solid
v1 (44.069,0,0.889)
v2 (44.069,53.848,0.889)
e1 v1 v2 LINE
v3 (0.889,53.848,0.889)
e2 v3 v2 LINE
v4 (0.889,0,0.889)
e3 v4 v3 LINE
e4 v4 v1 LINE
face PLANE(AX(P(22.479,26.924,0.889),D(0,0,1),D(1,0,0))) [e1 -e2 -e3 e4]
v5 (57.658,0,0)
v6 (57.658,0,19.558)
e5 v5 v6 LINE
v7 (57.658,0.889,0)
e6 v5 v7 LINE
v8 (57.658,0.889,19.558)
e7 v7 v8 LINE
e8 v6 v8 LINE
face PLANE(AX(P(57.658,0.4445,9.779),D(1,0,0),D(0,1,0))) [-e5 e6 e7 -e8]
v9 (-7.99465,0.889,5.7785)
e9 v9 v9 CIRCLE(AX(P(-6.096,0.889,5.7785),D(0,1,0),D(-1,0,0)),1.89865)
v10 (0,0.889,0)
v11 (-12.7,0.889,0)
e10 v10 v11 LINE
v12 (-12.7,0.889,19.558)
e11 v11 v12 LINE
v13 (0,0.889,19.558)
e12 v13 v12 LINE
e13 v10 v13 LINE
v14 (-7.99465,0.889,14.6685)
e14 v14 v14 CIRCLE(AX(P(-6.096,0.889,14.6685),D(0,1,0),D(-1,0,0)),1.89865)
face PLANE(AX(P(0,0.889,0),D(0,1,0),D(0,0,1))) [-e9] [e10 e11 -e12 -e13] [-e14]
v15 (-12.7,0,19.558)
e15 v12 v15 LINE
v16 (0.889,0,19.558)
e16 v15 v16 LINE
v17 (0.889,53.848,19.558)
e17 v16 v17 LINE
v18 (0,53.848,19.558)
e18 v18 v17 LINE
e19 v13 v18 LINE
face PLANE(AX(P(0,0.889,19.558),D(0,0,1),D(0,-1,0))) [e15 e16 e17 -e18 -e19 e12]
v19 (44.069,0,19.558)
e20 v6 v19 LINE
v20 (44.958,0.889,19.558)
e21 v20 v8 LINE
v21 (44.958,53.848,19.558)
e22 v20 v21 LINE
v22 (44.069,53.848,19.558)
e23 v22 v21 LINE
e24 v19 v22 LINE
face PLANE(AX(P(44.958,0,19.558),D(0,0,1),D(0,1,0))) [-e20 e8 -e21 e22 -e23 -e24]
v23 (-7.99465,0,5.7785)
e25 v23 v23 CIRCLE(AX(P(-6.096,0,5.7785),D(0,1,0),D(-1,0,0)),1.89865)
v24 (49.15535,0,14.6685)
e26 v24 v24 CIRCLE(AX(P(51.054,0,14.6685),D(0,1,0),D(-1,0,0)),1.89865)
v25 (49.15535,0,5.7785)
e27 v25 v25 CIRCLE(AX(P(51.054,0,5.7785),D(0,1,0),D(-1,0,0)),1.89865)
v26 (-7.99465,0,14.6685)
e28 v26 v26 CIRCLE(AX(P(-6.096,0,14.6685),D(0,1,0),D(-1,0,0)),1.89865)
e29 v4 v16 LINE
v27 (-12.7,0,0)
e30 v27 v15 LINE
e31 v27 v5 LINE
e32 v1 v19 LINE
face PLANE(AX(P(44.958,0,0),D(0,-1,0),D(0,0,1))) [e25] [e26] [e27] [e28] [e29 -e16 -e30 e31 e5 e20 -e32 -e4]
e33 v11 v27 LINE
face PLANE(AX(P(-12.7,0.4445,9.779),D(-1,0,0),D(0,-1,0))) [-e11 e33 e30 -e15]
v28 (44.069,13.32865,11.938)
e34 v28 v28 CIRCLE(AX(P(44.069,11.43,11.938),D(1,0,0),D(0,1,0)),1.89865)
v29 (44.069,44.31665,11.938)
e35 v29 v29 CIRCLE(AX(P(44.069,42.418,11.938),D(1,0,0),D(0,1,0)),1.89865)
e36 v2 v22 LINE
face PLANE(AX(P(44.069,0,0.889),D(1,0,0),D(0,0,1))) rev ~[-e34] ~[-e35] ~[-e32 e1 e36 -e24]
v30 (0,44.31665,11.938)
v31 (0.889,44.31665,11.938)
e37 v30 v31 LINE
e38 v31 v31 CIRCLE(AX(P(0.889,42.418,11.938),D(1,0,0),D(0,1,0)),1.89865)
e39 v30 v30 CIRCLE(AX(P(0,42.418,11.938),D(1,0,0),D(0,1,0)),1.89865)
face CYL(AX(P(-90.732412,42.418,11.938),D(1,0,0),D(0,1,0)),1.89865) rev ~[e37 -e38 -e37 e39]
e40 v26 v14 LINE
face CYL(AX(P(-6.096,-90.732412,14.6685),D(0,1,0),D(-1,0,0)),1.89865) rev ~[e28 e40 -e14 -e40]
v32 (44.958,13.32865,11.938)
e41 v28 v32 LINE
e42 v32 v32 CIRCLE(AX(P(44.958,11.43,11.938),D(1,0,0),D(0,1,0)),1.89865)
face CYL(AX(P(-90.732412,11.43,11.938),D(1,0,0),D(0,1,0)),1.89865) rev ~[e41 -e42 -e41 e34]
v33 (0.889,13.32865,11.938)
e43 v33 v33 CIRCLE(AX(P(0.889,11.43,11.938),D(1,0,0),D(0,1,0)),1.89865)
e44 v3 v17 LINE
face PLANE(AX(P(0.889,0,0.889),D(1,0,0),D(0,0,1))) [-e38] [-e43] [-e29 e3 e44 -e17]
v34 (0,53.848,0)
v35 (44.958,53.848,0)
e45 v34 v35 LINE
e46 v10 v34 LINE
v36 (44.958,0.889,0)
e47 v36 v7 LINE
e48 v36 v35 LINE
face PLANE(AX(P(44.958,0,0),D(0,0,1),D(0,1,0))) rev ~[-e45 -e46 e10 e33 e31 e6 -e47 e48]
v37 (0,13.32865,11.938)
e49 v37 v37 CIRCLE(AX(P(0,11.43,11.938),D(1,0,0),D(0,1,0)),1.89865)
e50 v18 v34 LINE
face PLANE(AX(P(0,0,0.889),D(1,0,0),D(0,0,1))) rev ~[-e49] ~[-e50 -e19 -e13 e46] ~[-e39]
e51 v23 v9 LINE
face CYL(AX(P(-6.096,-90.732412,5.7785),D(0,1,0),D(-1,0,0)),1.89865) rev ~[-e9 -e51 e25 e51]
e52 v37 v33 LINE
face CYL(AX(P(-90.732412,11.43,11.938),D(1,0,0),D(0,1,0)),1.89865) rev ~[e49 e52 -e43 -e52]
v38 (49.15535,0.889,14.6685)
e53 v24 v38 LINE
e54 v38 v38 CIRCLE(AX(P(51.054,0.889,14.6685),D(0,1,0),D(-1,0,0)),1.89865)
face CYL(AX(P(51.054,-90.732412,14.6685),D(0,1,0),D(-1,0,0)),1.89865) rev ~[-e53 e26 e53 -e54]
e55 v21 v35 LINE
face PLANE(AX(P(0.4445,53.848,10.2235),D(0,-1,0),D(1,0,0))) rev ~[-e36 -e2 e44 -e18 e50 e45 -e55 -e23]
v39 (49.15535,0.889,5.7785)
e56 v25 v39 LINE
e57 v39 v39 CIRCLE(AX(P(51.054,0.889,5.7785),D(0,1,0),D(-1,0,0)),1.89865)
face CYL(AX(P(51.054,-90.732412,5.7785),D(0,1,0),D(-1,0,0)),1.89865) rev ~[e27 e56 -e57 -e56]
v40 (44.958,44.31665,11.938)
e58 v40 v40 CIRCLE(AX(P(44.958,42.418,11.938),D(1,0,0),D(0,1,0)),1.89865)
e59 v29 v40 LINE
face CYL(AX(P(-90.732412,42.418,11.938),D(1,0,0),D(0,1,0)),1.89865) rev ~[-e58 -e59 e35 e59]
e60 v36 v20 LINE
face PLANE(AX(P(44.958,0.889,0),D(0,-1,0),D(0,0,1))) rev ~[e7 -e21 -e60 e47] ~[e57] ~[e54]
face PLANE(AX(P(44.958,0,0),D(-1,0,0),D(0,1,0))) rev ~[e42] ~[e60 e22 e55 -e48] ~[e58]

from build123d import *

# Parameters (mm, degrees)
F0_W     = 44.958
F0_H     = 53.848
F1_DEPTH = 0.889
F2_W     = 0.889
F2_H     = 18.669
F3_DEPTH = 53.848
F4_W     = 0.889
F4_H     = 19.558
F5_DEPTH = 12.7
F6_W     = 0.889
F6_H     = 19.558
F7_DEPTH = 12.7
F9_D     = 3.7973
F11_D    = 3.7973


# Not quite as in the source:
# - a feature names something its author has since deleted; it is built from what else it names


with BuildPart() as f1:
    # F0 (on Top) → F1 (new body)
    with BuildSketch(Plane.XY):
        with Locations((22.479, 26.924)):
            Rectangle(F0_W, F0_H)
    extrude(amount=F1_DEPTH)

    # F2 (on face) → F3 (join, through all)
    with BuildSketch(Plane.XZ):
        with Locations((0.4445, 10.2235)):
            Rectangle(F2_W, F2_H)
        with Locations((44.5135, 10.2235)):
            Rectangle(F2_W, F2_H)
    extrude(amount=-F3_DEPTH)

    # F4 (on face) → F5 (join)
    with BuildSketch(Plane(origin=(0, 0, 0), x_dir=(0, -1, 0), z_dir=(-1, 0, 0))):
        with Locations((-0.4445, 9.779)):
            Rectangle(F4_W, F4_H)
    extrude(amount=F5_DEPTH)

    # F6 (on face) → F7 (join)
    with BuildSketch(Plane.YZ.offset(44.958)):
        with Locations((0.4445, 9.779)):
            Rectangle(F6_W, F6_H)
    extrude(amount=F7_DEPTH)

    # F9 (through all)
    with Locations(Plane.XZ):
        with Locations((-6.096, 14.6685), (-6.096, 5.7785), (51.054, 5.7785), (51.054, 14.6685)):
            Hole(F9_D / 2)

    # F11 (through all)
    with Locations(Plane(origin=(0, 0, 0), x_dir=(0, -1, 0), z_dir=(-1, 0, 0))):
        with Locations((-11.43, 11.938), (-42.418, 11.938)):
            Hole(F11_D / 2)


solid = f1.part
